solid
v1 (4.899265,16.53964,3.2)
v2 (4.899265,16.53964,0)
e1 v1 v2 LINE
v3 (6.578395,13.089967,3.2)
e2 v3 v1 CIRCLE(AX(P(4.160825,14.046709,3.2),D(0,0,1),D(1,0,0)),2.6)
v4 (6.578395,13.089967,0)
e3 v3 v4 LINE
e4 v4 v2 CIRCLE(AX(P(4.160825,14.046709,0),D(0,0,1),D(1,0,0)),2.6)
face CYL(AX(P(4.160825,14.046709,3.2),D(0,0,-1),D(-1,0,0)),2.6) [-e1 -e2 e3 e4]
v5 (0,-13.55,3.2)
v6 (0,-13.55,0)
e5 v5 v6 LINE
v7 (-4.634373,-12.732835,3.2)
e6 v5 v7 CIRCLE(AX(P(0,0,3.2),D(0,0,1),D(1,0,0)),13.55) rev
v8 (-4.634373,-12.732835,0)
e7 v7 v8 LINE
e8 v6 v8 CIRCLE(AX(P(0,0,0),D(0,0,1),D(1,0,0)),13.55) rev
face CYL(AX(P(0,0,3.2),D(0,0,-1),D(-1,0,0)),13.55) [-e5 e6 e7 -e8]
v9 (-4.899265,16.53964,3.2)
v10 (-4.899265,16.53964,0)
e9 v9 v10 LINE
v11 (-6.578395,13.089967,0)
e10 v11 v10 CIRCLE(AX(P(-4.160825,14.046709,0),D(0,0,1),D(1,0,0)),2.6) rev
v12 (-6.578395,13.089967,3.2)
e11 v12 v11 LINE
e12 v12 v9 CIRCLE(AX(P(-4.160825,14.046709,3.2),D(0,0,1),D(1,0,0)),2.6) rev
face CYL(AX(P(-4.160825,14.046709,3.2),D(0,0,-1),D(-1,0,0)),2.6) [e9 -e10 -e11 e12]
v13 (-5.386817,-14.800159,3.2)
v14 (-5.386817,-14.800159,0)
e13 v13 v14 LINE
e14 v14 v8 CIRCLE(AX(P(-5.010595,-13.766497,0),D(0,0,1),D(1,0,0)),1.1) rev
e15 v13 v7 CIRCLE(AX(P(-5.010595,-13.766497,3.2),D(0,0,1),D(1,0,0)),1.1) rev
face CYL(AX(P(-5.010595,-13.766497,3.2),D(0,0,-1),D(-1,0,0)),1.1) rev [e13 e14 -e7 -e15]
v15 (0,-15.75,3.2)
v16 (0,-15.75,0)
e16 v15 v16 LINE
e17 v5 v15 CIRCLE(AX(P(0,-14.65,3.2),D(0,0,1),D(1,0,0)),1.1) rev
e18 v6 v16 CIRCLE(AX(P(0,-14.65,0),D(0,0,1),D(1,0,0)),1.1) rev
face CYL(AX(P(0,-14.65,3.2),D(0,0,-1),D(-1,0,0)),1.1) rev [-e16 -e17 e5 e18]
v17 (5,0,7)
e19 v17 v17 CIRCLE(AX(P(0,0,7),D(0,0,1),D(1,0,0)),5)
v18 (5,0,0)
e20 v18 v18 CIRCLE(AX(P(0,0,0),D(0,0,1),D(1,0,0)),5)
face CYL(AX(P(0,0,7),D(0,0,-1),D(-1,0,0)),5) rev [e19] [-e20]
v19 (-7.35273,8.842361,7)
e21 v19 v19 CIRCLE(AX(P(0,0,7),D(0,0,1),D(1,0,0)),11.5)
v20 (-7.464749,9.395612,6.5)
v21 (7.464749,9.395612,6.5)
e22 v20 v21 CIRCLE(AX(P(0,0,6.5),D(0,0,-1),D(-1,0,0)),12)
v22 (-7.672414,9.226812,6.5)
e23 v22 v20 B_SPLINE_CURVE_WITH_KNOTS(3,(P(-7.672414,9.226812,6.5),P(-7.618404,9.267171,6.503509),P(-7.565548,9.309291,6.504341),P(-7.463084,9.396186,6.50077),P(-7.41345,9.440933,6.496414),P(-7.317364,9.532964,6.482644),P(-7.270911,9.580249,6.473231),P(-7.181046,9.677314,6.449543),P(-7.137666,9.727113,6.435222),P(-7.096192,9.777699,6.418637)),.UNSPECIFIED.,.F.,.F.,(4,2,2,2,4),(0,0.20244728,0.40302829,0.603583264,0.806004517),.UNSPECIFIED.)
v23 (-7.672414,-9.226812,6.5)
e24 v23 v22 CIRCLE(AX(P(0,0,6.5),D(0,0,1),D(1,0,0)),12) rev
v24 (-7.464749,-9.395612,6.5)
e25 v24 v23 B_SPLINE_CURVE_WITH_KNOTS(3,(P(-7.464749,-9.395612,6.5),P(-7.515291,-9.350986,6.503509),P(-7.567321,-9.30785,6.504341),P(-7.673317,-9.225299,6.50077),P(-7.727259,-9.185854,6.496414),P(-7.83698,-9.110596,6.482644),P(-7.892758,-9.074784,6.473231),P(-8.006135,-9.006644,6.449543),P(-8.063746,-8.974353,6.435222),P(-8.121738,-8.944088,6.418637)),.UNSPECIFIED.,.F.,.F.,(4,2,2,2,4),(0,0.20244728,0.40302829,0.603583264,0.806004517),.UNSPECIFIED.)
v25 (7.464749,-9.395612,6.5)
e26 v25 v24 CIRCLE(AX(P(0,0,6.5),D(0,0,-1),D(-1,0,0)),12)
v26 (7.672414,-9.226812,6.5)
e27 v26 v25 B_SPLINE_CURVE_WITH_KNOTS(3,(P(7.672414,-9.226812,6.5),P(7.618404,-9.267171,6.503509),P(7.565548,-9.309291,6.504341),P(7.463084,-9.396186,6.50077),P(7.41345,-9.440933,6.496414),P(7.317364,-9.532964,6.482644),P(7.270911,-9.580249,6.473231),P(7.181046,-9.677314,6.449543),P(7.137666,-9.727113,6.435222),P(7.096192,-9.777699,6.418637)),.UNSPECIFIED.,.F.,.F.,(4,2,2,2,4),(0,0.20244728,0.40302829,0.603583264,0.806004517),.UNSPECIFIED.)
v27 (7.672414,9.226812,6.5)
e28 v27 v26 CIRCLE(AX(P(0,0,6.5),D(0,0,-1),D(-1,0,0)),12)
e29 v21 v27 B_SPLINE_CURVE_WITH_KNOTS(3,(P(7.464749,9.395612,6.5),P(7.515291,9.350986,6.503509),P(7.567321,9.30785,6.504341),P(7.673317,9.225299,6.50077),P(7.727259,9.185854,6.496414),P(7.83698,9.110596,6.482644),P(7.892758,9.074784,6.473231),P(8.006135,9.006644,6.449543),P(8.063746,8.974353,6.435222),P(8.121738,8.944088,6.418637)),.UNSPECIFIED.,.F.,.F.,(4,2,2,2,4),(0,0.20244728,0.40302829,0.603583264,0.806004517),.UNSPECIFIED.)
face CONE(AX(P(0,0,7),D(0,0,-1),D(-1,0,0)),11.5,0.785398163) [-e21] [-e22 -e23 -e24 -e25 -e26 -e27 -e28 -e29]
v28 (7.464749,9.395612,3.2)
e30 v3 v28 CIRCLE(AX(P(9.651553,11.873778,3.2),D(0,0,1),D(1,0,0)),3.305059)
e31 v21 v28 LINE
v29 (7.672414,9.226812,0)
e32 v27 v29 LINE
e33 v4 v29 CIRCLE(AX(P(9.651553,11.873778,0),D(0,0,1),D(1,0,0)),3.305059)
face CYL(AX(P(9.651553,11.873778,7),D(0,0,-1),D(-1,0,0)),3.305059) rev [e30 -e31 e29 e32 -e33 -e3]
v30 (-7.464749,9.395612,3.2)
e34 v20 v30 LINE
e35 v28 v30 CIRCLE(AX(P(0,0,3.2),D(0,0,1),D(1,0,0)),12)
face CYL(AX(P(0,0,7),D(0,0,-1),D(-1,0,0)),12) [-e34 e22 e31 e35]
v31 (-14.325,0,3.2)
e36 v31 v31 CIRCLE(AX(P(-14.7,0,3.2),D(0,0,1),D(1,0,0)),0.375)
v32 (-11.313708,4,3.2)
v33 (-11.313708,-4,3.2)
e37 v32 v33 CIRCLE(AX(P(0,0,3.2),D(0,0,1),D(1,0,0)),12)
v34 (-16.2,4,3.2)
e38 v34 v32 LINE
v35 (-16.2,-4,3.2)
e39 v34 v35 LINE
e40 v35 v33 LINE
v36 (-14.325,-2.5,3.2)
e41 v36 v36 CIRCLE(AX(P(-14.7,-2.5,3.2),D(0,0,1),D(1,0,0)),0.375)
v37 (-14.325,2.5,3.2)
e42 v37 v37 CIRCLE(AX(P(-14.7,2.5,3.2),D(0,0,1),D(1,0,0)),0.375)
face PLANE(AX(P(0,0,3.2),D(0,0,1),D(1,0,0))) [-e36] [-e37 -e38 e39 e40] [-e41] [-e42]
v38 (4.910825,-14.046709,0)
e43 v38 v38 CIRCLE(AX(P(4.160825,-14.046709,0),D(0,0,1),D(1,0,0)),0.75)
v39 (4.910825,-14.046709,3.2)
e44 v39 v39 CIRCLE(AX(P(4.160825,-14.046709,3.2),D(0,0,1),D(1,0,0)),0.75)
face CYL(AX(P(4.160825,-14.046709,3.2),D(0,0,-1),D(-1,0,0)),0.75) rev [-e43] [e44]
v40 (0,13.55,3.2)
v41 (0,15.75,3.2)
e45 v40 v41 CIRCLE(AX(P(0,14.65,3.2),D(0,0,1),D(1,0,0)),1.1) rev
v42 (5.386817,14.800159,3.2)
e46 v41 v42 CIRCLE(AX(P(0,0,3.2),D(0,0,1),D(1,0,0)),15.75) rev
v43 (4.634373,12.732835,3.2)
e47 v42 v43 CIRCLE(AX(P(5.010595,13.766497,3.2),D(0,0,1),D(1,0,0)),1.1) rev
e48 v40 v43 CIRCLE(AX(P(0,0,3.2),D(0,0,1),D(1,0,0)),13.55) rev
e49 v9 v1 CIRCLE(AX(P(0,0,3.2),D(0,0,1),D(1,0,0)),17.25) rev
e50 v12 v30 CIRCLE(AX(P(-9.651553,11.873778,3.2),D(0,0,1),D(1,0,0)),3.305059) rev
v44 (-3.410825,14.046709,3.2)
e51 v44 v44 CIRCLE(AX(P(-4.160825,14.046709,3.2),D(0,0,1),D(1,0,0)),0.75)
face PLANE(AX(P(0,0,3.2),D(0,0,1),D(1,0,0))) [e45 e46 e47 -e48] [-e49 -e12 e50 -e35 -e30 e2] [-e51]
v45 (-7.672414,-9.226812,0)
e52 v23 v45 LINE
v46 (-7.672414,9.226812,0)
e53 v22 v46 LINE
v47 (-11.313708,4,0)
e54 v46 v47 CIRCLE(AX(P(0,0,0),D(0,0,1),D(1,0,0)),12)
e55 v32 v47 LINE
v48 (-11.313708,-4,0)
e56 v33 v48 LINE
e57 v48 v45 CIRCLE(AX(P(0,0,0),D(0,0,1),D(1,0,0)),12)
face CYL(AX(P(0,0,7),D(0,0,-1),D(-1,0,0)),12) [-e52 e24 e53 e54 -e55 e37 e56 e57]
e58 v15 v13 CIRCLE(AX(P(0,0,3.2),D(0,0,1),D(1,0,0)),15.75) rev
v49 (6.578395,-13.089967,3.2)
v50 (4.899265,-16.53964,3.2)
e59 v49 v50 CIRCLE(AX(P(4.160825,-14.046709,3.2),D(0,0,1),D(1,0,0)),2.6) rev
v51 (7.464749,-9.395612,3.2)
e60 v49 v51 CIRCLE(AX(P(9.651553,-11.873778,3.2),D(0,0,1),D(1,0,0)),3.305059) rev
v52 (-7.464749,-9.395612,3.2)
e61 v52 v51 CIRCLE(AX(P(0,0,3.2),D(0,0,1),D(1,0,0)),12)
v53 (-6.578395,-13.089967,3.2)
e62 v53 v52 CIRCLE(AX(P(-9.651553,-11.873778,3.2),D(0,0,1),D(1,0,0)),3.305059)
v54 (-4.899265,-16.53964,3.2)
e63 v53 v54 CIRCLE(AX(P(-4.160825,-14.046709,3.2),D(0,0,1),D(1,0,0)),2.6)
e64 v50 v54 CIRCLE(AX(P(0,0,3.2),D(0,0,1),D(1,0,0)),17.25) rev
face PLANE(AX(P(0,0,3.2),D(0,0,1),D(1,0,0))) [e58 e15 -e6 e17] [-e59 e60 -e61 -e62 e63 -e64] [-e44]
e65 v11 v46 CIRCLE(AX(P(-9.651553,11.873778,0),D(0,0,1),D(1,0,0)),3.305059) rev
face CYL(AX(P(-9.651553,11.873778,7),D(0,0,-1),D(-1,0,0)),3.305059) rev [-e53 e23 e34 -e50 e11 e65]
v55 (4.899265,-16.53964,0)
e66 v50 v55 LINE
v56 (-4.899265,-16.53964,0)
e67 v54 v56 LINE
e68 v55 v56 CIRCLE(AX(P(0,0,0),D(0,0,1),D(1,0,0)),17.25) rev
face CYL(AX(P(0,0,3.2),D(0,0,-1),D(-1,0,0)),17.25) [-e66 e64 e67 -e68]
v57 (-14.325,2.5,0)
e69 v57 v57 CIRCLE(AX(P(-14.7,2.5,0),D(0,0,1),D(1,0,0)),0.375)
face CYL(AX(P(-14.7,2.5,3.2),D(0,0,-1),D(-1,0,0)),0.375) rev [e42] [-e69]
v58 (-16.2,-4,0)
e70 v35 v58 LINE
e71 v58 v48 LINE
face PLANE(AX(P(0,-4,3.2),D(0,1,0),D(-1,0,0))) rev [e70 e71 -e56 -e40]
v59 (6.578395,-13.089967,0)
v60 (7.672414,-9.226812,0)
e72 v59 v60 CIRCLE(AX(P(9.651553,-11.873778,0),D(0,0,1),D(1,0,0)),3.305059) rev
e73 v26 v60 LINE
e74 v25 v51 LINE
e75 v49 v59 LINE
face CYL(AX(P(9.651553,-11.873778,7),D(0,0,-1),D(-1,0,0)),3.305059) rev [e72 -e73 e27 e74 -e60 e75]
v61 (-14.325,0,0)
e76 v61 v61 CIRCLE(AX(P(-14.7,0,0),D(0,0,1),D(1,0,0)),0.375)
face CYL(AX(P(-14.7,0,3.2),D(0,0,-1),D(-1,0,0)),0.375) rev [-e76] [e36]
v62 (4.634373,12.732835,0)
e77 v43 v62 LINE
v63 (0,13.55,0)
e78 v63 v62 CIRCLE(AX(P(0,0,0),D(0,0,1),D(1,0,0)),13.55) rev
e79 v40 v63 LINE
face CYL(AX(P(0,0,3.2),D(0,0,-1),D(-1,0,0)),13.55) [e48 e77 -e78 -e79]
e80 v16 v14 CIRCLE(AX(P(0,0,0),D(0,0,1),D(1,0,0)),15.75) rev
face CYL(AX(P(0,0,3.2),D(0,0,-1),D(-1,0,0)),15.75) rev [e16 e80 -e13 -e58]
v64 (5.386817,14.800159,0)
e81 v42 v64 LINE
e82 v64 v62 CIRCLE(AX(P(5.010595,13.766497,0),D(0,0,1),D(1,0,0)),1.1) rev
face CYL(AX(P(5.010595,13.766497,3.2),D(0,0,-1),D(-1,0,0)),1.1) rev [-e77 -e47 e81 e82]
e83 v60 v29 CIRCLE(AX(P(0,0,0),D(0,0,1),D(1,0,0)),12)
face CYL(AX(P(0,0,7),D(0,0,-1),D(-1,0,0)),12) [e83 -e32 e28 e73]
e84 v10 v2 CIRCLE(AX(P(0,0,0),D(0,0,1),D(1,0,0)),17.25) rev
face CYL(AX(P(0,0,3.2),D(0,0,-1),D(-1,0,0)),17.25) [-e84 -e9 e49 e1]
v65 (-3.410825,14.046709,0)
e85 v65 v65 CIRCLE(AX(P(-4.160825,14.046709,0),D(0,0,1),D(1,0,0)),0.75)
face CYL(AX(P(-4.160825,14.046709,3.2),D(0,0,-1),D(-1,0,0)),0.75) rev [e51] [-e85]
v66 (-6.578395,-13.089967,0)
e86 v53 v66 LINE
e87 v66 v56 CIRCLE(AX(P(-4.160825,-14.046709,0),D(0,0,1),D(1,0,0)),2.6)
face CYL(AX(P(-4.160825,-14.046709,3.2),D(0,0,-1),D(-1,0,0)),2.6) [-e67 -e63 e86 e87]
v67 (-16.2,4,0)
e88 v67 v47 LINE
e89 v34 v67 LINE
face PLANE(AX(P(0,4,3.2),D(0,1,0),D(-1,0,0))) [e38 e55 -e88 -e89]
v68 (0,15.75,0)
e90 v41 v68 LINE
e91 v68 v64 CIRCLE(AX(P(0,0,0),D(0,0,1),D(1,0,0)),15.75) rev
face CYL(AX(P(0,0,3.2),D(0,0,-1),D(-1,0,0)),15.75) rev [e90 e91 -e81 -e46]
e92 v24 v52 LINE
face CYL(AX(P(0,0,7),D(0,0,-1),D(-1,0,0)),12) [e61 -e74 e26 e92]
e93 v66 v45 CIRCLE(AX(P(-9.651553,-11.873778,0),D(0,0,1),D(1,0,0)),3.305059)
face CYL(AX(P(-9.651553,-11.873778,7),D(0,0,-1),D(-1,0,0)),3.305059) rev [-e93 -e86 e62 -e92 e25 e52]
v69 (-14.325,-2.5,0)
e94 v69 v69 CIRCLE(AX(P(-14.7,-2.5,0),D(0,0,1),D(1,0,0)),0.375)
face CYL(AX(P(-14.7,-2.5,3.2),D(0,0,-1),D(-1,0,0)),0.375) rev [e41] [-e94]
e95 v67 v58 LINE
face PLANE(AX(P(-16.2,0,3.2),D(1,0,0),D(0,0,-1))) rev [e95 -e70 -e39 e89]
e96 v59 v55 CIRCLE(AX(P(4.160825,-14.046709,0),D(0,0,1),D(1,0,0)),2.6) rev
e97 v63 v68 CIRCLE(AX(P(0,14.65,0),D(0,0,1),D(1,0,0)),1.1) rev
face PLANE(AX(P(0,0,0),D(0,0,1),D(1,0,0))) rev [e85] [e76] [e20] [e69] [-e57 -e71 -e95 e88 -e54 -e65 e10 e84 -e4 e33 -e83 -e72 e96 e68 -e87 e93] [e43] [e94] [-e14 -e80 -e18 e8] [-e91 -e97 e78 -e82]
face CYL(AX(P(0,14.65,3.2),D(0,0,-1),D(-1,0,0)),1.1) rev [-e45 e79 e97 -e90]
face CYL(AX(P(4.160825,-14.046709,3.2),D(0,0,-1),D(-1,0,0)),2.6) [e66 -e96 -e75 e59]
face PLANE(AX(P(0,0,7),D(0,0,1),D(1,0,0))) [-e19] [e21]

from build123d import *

# Parameters (mm, degrees)
SKETCH1_R           = 5
BOSS_EXTRUDE1_DEPTH = 7
SKETCH1_3_R         = 0.75
SKETCH1_3_R_2       = 0.37500000000000105
SKETCH1_3_R_3       = 0.375000000000001
SKETCH1_3_R_4       = 0.7500000000000001
BOSS_EXTRUDE2_DEPTH = 3.2
CHAMFER1_SIZE       = 0.5


with BuildPart() as part:
    # Sketch1 → Boss-Extrude1 (new body)
    with BuildSketch(Plane.XY):
        with BuildLine():
            ThreePointArc((-7.67241426287147, 9.226811983501475), (-9.846222893058407, 6.8594383691533025), (-11.31370849898476, 4))
            ThreePointArc((-11.31370849898476, 4), (-12, 1.47e-15), (-11.313708498984761, -3.9999999999999973))
            ThreePointArc((-11.313708498984761, -3.9999999999999973), (-9.846222893058428, -6.859438369153274), (-7.672414262871522, -9.226811983501433))
            ThreePointArc((-7.672414262871518, -9.226811983501431), (-7.566872377799013, -9.309109229750973), (-7.464748895834485, -9.395611950380768))
            ThreePointArc((-7.464748895834483, -9.395611950380767), (1.911e-14, -12), (7.464748895834521, -9.395611950380736))
            ThreePointArc((7.464748895834522, -9.395611950380738), (7.566872377798977, -9.309109229751012), (7.6724142628714045, -9.226811983501536))
            ThreePointArc((7.672414262871396, -9.226811983501538), (10.864367702596793, -5.0956368024783405), (12, -2.94e-15))
            ThreePointArc((12, 0), (10.864367702596812, 5.095636802478297), (7.672414262871458, 9.226811983501484))
            ThreePointArc((7.672414262871453, 9.22681198350148), (7.5668723777987985, 9.309109229751144), (7.4647488958341315, 9.395611950381072))
            ThreePointArc((7.464748895834118, 9.395611950381056), (-2.7638e-13, 12), (-7.464748895834552, 9.395611950380712))
            ThreePointArc((-7.464748895834552, 9.395611950380712), (-7.566872377799023, 9.30910922975097), (-7.672414262871468, 9.226811983501477))
        make_face()
        Circle(SKETCH1_R, mode=Mode.SUBTRACT)
    extrude(amount=BOSS_EXTRUDE1_DEPTH)

    # Sketch1<3> → Boss-Extrude2 (add)
    # profile 1 of 3: a face of its own
    with BuildSketch(Plane.XY):
        with BuildLine():
            ThreePointArc((-6.57839458957231, 13.089966563130929), (-6.4376977661817865, 11.10270546197924), (-7.464748895834552, 9.395611950380712))
            ThreePointArc((-7.464748895834552, 9.395611950380712), (-2.7638e-13, 12), (7.464748895834118, 9.395611950381056))
            ThreePointArc((7.4647488958341315, 9.395611950381072), (6.437697766181707, 11.102705461979504), (6.578394589572291, 13.089966563130933))
            ThreePointArc((6.578394589572291, 13.089966563130933), (6.498593335336791, 15.184618723292306), (4.899264696142665, 16.53964042647633))
            ThreePointArc((4.899264696142668, 16.539640426476332), (-9.55e-15, 17.250000000000007), (-4.899264696142684, 16.539640426476325))
            ThreePointArc((-4.899264696142685, 16.539640426476325), (-6.49859333533681, 15.184618723292303), (-6.57839458957231, 13.089966563130929))
        make_face()
        with Locations((-4.160824799912482, 14.046709115819024)):
            Circle(SKETCH1_3_R, mode=Mode.SUBTRACT)
        with BuildLine():
            ThreePointArc((-2e-17, 13.55), (-1.1000000000000003, 14.65), (1.8e-16, 15.75))
            ThreePointArc((1.8e-16, 15.75), (2.734958798254155, 15.510722109942275), (5.3868172573792865, 14.800158777378059))
            ThreePointArc((5.3868172573792865, 14.800158777378059), (6.04425698258554, 13.390274736855329), (4.634372942062814, 12.732835011649062))
            ThreePointArc((4.634372942062814, 12.732835011649065), (2.352932807386907, 13.344145053315419), (-2e-17, 13.550000000000002))
        make_face(mode=Mode.SUBTRACT)
    # profile 2 of 3: a face of its own
    with BuildSketch(Plane.XY):
        with BuildLine():
            Line((-11.313708498984761, 3.9999999999999982), (-16.2, 4))
            Line((-16.2, 4), (-16.2, -4))
            Line((-16.2, -4), (-11.313708498984761, -3.9999999999999982))
            ThreePointArc((-11.313708498984761, -3.9999999999999973), (-12, 1.47e-15), (-11.31370849898476, 4))
        make_face()
        with Locations((-14.7, -2.5)):
            Circle(SKETCH1_3_R_2, mode=Mode.SUBTRACT)
        with Locations((-14.7, 0)):
            Circle(SKETCH1_3_R_3, mode=Mode.SUBTRACT)
        with Locations((-14.7, 2.5)):
            Circle(SKETCH1_3_R_2, mode=Mode.SUBTRACT)
    # profile 3 of 3: a face of its own
    with BuildSketch(Plane.XY):
        with BuildLine():
            ThreePointArc((7.464748895834521, -9.395611950380736), (1.911e-14, -12), (-7.464748895834483, -9.395611950380767))
            ThreePointArc((-7.464748895834485, -9.395611950380768), (-6.437697766181827, -11.102705461979276), (-6.578394589572382, -13.08996656313089))
            ThreePointArc((-6.578394589572383, -13.08996656313089), (-6.498593335336874, -15.184618723292306), (-4.899264696142685, -16.539640426476325))
            ThreePointArc((-4.899264696142686, -16.539640426476325), (-2e-15, -17.250000000000004), (4.899264696142684, -16.53964042647633))
            ThreePointArc((4.899264696142683, -16.539640426476325), (6.498593335336733, -15.184618723292296), (6.57839458957222, -13.089966563130977))
            ThreePointArc((6.57839458957222, -13.089966563130977), (6.437697766181717, -11.102705461979264), (7.464748895834522, -9.395611950380738))
        make_face()
        with BuildLine():
            ThreePointArc((-4.634372942062905, -12.732835011649033), (-2.3529328073870017, -13.344145053315408), (-9.46e-14, -13.550000000000006))
            ThreePointArc((-9.46e-14, -13.550000000000004), (1.099999999999898, -14.650000000000011), (-1.1017e-13, -15.750000000000004))
            ThreePointArc((-1.1017e-13, -15.750000000000004), (-2.734958798254263, -15.510722109942261), (-5.3868172573793895, -14.800158777378023))
            ThreePointArc((-5.3868172573793895, -14.800158777378021), (-6.044256982585632, -13.390274736855288), (-4.634372942062904, -12.73283501164903))
        make_face(mode=Mode.SUBTRACT)
        with Locations((4.160824799912384, -14.046709115819057)):
            Circle(SKETCH1_3_R_4, mode=Mode.SUBTRACT)
    extrude(amount=BOSS_EXTRUDE2_DEPTH)

    # Chamfer1
    # the kernel refuses this chamfer: 0.5 mm, written as the material it takes off along each edge
    with BuildSketch(Plane(origin=(4.4e-16, 8.88e-15, 7), x_dir=(-0.7022542311891906, -0.7119262565581345, 0), z_dir=(-0.7119262565581345, 0.7022542311891906, 0))) as chamfer1_piece_1:
        Polygon((12.00000000000001, -CHAMFER1_SIZE), (12.00000000000001 - CHAMFER1_SIZE, 0), (12.00000000000001, 0), align=None)
    revolve(axis=Axis((4.4e-16, 8.88e-15, 7), (0, 0, 1)), revolution_arc=89.21628448783436, mode=Mode.SUBTRACT)
    with BuildSketch(Plane(origin=(0, -1.55e-15, 7), x_dir=(0.5534232565861029, 0.8329001735319981, 0), z_dir=(-0.8329001735319981, 0.5534232565861029, 0))) as chamfer1_piece_2:
        Polygon((12.000000000000009, CHAMFER1_SIZE), (12.000000000000009 - CHAMFER1_SIZE, 0), (12.000000000000009, 0), align=None)
    revolve(axis=Axis((0, -1.55e-15, 7), (0, 0, -1)), revolution_arc=112.79563771505457, mode=Mode.SUBTRACT)
    with BuildSketch(Plane(origin=(0, 0, 7), x_dir=(0.7022542311891632, 0.7119262565581616, 0), z_dir=(0.7119262565581616, -0.7022542311891632, 0))) as chamfer1_piece_3:
        Polygon((12.000000000000002, -CHAMFER1_SIZE), (12.000000000000002 - CHAMFER1_SIZE, 0), (12.000000000000002, 0), align=None)
    revolve(axis=Axis((0, 0, 7), (0, 0, 1)), revolution_arc=89.2162844878324, mode=Mode.SUBTRACT)
    with BuildSketch(Plane(origin=(-2.309e-14, -1.688e-14, 7), x_dir=(-0.5534232565861079, -0.8329001735319947, 0), z_dir=(0.8329001735319947, -0.5534232565861079, 0))) as chamfer1_piece_4:
        Polygon((12.00000000000003, CHAMFER1_SIZE), (12.00000000000003 - CHAMFER1_SIZE, 0), (12.00000000000003, 0), align=None)
    revolve(axis=Axis((-2.309e-14, -1.688e-14, 7), (0, 0, -1)), revolution_arc=112.79563771505396, mode=Mode.SUBTRACT)


solid = part.part
